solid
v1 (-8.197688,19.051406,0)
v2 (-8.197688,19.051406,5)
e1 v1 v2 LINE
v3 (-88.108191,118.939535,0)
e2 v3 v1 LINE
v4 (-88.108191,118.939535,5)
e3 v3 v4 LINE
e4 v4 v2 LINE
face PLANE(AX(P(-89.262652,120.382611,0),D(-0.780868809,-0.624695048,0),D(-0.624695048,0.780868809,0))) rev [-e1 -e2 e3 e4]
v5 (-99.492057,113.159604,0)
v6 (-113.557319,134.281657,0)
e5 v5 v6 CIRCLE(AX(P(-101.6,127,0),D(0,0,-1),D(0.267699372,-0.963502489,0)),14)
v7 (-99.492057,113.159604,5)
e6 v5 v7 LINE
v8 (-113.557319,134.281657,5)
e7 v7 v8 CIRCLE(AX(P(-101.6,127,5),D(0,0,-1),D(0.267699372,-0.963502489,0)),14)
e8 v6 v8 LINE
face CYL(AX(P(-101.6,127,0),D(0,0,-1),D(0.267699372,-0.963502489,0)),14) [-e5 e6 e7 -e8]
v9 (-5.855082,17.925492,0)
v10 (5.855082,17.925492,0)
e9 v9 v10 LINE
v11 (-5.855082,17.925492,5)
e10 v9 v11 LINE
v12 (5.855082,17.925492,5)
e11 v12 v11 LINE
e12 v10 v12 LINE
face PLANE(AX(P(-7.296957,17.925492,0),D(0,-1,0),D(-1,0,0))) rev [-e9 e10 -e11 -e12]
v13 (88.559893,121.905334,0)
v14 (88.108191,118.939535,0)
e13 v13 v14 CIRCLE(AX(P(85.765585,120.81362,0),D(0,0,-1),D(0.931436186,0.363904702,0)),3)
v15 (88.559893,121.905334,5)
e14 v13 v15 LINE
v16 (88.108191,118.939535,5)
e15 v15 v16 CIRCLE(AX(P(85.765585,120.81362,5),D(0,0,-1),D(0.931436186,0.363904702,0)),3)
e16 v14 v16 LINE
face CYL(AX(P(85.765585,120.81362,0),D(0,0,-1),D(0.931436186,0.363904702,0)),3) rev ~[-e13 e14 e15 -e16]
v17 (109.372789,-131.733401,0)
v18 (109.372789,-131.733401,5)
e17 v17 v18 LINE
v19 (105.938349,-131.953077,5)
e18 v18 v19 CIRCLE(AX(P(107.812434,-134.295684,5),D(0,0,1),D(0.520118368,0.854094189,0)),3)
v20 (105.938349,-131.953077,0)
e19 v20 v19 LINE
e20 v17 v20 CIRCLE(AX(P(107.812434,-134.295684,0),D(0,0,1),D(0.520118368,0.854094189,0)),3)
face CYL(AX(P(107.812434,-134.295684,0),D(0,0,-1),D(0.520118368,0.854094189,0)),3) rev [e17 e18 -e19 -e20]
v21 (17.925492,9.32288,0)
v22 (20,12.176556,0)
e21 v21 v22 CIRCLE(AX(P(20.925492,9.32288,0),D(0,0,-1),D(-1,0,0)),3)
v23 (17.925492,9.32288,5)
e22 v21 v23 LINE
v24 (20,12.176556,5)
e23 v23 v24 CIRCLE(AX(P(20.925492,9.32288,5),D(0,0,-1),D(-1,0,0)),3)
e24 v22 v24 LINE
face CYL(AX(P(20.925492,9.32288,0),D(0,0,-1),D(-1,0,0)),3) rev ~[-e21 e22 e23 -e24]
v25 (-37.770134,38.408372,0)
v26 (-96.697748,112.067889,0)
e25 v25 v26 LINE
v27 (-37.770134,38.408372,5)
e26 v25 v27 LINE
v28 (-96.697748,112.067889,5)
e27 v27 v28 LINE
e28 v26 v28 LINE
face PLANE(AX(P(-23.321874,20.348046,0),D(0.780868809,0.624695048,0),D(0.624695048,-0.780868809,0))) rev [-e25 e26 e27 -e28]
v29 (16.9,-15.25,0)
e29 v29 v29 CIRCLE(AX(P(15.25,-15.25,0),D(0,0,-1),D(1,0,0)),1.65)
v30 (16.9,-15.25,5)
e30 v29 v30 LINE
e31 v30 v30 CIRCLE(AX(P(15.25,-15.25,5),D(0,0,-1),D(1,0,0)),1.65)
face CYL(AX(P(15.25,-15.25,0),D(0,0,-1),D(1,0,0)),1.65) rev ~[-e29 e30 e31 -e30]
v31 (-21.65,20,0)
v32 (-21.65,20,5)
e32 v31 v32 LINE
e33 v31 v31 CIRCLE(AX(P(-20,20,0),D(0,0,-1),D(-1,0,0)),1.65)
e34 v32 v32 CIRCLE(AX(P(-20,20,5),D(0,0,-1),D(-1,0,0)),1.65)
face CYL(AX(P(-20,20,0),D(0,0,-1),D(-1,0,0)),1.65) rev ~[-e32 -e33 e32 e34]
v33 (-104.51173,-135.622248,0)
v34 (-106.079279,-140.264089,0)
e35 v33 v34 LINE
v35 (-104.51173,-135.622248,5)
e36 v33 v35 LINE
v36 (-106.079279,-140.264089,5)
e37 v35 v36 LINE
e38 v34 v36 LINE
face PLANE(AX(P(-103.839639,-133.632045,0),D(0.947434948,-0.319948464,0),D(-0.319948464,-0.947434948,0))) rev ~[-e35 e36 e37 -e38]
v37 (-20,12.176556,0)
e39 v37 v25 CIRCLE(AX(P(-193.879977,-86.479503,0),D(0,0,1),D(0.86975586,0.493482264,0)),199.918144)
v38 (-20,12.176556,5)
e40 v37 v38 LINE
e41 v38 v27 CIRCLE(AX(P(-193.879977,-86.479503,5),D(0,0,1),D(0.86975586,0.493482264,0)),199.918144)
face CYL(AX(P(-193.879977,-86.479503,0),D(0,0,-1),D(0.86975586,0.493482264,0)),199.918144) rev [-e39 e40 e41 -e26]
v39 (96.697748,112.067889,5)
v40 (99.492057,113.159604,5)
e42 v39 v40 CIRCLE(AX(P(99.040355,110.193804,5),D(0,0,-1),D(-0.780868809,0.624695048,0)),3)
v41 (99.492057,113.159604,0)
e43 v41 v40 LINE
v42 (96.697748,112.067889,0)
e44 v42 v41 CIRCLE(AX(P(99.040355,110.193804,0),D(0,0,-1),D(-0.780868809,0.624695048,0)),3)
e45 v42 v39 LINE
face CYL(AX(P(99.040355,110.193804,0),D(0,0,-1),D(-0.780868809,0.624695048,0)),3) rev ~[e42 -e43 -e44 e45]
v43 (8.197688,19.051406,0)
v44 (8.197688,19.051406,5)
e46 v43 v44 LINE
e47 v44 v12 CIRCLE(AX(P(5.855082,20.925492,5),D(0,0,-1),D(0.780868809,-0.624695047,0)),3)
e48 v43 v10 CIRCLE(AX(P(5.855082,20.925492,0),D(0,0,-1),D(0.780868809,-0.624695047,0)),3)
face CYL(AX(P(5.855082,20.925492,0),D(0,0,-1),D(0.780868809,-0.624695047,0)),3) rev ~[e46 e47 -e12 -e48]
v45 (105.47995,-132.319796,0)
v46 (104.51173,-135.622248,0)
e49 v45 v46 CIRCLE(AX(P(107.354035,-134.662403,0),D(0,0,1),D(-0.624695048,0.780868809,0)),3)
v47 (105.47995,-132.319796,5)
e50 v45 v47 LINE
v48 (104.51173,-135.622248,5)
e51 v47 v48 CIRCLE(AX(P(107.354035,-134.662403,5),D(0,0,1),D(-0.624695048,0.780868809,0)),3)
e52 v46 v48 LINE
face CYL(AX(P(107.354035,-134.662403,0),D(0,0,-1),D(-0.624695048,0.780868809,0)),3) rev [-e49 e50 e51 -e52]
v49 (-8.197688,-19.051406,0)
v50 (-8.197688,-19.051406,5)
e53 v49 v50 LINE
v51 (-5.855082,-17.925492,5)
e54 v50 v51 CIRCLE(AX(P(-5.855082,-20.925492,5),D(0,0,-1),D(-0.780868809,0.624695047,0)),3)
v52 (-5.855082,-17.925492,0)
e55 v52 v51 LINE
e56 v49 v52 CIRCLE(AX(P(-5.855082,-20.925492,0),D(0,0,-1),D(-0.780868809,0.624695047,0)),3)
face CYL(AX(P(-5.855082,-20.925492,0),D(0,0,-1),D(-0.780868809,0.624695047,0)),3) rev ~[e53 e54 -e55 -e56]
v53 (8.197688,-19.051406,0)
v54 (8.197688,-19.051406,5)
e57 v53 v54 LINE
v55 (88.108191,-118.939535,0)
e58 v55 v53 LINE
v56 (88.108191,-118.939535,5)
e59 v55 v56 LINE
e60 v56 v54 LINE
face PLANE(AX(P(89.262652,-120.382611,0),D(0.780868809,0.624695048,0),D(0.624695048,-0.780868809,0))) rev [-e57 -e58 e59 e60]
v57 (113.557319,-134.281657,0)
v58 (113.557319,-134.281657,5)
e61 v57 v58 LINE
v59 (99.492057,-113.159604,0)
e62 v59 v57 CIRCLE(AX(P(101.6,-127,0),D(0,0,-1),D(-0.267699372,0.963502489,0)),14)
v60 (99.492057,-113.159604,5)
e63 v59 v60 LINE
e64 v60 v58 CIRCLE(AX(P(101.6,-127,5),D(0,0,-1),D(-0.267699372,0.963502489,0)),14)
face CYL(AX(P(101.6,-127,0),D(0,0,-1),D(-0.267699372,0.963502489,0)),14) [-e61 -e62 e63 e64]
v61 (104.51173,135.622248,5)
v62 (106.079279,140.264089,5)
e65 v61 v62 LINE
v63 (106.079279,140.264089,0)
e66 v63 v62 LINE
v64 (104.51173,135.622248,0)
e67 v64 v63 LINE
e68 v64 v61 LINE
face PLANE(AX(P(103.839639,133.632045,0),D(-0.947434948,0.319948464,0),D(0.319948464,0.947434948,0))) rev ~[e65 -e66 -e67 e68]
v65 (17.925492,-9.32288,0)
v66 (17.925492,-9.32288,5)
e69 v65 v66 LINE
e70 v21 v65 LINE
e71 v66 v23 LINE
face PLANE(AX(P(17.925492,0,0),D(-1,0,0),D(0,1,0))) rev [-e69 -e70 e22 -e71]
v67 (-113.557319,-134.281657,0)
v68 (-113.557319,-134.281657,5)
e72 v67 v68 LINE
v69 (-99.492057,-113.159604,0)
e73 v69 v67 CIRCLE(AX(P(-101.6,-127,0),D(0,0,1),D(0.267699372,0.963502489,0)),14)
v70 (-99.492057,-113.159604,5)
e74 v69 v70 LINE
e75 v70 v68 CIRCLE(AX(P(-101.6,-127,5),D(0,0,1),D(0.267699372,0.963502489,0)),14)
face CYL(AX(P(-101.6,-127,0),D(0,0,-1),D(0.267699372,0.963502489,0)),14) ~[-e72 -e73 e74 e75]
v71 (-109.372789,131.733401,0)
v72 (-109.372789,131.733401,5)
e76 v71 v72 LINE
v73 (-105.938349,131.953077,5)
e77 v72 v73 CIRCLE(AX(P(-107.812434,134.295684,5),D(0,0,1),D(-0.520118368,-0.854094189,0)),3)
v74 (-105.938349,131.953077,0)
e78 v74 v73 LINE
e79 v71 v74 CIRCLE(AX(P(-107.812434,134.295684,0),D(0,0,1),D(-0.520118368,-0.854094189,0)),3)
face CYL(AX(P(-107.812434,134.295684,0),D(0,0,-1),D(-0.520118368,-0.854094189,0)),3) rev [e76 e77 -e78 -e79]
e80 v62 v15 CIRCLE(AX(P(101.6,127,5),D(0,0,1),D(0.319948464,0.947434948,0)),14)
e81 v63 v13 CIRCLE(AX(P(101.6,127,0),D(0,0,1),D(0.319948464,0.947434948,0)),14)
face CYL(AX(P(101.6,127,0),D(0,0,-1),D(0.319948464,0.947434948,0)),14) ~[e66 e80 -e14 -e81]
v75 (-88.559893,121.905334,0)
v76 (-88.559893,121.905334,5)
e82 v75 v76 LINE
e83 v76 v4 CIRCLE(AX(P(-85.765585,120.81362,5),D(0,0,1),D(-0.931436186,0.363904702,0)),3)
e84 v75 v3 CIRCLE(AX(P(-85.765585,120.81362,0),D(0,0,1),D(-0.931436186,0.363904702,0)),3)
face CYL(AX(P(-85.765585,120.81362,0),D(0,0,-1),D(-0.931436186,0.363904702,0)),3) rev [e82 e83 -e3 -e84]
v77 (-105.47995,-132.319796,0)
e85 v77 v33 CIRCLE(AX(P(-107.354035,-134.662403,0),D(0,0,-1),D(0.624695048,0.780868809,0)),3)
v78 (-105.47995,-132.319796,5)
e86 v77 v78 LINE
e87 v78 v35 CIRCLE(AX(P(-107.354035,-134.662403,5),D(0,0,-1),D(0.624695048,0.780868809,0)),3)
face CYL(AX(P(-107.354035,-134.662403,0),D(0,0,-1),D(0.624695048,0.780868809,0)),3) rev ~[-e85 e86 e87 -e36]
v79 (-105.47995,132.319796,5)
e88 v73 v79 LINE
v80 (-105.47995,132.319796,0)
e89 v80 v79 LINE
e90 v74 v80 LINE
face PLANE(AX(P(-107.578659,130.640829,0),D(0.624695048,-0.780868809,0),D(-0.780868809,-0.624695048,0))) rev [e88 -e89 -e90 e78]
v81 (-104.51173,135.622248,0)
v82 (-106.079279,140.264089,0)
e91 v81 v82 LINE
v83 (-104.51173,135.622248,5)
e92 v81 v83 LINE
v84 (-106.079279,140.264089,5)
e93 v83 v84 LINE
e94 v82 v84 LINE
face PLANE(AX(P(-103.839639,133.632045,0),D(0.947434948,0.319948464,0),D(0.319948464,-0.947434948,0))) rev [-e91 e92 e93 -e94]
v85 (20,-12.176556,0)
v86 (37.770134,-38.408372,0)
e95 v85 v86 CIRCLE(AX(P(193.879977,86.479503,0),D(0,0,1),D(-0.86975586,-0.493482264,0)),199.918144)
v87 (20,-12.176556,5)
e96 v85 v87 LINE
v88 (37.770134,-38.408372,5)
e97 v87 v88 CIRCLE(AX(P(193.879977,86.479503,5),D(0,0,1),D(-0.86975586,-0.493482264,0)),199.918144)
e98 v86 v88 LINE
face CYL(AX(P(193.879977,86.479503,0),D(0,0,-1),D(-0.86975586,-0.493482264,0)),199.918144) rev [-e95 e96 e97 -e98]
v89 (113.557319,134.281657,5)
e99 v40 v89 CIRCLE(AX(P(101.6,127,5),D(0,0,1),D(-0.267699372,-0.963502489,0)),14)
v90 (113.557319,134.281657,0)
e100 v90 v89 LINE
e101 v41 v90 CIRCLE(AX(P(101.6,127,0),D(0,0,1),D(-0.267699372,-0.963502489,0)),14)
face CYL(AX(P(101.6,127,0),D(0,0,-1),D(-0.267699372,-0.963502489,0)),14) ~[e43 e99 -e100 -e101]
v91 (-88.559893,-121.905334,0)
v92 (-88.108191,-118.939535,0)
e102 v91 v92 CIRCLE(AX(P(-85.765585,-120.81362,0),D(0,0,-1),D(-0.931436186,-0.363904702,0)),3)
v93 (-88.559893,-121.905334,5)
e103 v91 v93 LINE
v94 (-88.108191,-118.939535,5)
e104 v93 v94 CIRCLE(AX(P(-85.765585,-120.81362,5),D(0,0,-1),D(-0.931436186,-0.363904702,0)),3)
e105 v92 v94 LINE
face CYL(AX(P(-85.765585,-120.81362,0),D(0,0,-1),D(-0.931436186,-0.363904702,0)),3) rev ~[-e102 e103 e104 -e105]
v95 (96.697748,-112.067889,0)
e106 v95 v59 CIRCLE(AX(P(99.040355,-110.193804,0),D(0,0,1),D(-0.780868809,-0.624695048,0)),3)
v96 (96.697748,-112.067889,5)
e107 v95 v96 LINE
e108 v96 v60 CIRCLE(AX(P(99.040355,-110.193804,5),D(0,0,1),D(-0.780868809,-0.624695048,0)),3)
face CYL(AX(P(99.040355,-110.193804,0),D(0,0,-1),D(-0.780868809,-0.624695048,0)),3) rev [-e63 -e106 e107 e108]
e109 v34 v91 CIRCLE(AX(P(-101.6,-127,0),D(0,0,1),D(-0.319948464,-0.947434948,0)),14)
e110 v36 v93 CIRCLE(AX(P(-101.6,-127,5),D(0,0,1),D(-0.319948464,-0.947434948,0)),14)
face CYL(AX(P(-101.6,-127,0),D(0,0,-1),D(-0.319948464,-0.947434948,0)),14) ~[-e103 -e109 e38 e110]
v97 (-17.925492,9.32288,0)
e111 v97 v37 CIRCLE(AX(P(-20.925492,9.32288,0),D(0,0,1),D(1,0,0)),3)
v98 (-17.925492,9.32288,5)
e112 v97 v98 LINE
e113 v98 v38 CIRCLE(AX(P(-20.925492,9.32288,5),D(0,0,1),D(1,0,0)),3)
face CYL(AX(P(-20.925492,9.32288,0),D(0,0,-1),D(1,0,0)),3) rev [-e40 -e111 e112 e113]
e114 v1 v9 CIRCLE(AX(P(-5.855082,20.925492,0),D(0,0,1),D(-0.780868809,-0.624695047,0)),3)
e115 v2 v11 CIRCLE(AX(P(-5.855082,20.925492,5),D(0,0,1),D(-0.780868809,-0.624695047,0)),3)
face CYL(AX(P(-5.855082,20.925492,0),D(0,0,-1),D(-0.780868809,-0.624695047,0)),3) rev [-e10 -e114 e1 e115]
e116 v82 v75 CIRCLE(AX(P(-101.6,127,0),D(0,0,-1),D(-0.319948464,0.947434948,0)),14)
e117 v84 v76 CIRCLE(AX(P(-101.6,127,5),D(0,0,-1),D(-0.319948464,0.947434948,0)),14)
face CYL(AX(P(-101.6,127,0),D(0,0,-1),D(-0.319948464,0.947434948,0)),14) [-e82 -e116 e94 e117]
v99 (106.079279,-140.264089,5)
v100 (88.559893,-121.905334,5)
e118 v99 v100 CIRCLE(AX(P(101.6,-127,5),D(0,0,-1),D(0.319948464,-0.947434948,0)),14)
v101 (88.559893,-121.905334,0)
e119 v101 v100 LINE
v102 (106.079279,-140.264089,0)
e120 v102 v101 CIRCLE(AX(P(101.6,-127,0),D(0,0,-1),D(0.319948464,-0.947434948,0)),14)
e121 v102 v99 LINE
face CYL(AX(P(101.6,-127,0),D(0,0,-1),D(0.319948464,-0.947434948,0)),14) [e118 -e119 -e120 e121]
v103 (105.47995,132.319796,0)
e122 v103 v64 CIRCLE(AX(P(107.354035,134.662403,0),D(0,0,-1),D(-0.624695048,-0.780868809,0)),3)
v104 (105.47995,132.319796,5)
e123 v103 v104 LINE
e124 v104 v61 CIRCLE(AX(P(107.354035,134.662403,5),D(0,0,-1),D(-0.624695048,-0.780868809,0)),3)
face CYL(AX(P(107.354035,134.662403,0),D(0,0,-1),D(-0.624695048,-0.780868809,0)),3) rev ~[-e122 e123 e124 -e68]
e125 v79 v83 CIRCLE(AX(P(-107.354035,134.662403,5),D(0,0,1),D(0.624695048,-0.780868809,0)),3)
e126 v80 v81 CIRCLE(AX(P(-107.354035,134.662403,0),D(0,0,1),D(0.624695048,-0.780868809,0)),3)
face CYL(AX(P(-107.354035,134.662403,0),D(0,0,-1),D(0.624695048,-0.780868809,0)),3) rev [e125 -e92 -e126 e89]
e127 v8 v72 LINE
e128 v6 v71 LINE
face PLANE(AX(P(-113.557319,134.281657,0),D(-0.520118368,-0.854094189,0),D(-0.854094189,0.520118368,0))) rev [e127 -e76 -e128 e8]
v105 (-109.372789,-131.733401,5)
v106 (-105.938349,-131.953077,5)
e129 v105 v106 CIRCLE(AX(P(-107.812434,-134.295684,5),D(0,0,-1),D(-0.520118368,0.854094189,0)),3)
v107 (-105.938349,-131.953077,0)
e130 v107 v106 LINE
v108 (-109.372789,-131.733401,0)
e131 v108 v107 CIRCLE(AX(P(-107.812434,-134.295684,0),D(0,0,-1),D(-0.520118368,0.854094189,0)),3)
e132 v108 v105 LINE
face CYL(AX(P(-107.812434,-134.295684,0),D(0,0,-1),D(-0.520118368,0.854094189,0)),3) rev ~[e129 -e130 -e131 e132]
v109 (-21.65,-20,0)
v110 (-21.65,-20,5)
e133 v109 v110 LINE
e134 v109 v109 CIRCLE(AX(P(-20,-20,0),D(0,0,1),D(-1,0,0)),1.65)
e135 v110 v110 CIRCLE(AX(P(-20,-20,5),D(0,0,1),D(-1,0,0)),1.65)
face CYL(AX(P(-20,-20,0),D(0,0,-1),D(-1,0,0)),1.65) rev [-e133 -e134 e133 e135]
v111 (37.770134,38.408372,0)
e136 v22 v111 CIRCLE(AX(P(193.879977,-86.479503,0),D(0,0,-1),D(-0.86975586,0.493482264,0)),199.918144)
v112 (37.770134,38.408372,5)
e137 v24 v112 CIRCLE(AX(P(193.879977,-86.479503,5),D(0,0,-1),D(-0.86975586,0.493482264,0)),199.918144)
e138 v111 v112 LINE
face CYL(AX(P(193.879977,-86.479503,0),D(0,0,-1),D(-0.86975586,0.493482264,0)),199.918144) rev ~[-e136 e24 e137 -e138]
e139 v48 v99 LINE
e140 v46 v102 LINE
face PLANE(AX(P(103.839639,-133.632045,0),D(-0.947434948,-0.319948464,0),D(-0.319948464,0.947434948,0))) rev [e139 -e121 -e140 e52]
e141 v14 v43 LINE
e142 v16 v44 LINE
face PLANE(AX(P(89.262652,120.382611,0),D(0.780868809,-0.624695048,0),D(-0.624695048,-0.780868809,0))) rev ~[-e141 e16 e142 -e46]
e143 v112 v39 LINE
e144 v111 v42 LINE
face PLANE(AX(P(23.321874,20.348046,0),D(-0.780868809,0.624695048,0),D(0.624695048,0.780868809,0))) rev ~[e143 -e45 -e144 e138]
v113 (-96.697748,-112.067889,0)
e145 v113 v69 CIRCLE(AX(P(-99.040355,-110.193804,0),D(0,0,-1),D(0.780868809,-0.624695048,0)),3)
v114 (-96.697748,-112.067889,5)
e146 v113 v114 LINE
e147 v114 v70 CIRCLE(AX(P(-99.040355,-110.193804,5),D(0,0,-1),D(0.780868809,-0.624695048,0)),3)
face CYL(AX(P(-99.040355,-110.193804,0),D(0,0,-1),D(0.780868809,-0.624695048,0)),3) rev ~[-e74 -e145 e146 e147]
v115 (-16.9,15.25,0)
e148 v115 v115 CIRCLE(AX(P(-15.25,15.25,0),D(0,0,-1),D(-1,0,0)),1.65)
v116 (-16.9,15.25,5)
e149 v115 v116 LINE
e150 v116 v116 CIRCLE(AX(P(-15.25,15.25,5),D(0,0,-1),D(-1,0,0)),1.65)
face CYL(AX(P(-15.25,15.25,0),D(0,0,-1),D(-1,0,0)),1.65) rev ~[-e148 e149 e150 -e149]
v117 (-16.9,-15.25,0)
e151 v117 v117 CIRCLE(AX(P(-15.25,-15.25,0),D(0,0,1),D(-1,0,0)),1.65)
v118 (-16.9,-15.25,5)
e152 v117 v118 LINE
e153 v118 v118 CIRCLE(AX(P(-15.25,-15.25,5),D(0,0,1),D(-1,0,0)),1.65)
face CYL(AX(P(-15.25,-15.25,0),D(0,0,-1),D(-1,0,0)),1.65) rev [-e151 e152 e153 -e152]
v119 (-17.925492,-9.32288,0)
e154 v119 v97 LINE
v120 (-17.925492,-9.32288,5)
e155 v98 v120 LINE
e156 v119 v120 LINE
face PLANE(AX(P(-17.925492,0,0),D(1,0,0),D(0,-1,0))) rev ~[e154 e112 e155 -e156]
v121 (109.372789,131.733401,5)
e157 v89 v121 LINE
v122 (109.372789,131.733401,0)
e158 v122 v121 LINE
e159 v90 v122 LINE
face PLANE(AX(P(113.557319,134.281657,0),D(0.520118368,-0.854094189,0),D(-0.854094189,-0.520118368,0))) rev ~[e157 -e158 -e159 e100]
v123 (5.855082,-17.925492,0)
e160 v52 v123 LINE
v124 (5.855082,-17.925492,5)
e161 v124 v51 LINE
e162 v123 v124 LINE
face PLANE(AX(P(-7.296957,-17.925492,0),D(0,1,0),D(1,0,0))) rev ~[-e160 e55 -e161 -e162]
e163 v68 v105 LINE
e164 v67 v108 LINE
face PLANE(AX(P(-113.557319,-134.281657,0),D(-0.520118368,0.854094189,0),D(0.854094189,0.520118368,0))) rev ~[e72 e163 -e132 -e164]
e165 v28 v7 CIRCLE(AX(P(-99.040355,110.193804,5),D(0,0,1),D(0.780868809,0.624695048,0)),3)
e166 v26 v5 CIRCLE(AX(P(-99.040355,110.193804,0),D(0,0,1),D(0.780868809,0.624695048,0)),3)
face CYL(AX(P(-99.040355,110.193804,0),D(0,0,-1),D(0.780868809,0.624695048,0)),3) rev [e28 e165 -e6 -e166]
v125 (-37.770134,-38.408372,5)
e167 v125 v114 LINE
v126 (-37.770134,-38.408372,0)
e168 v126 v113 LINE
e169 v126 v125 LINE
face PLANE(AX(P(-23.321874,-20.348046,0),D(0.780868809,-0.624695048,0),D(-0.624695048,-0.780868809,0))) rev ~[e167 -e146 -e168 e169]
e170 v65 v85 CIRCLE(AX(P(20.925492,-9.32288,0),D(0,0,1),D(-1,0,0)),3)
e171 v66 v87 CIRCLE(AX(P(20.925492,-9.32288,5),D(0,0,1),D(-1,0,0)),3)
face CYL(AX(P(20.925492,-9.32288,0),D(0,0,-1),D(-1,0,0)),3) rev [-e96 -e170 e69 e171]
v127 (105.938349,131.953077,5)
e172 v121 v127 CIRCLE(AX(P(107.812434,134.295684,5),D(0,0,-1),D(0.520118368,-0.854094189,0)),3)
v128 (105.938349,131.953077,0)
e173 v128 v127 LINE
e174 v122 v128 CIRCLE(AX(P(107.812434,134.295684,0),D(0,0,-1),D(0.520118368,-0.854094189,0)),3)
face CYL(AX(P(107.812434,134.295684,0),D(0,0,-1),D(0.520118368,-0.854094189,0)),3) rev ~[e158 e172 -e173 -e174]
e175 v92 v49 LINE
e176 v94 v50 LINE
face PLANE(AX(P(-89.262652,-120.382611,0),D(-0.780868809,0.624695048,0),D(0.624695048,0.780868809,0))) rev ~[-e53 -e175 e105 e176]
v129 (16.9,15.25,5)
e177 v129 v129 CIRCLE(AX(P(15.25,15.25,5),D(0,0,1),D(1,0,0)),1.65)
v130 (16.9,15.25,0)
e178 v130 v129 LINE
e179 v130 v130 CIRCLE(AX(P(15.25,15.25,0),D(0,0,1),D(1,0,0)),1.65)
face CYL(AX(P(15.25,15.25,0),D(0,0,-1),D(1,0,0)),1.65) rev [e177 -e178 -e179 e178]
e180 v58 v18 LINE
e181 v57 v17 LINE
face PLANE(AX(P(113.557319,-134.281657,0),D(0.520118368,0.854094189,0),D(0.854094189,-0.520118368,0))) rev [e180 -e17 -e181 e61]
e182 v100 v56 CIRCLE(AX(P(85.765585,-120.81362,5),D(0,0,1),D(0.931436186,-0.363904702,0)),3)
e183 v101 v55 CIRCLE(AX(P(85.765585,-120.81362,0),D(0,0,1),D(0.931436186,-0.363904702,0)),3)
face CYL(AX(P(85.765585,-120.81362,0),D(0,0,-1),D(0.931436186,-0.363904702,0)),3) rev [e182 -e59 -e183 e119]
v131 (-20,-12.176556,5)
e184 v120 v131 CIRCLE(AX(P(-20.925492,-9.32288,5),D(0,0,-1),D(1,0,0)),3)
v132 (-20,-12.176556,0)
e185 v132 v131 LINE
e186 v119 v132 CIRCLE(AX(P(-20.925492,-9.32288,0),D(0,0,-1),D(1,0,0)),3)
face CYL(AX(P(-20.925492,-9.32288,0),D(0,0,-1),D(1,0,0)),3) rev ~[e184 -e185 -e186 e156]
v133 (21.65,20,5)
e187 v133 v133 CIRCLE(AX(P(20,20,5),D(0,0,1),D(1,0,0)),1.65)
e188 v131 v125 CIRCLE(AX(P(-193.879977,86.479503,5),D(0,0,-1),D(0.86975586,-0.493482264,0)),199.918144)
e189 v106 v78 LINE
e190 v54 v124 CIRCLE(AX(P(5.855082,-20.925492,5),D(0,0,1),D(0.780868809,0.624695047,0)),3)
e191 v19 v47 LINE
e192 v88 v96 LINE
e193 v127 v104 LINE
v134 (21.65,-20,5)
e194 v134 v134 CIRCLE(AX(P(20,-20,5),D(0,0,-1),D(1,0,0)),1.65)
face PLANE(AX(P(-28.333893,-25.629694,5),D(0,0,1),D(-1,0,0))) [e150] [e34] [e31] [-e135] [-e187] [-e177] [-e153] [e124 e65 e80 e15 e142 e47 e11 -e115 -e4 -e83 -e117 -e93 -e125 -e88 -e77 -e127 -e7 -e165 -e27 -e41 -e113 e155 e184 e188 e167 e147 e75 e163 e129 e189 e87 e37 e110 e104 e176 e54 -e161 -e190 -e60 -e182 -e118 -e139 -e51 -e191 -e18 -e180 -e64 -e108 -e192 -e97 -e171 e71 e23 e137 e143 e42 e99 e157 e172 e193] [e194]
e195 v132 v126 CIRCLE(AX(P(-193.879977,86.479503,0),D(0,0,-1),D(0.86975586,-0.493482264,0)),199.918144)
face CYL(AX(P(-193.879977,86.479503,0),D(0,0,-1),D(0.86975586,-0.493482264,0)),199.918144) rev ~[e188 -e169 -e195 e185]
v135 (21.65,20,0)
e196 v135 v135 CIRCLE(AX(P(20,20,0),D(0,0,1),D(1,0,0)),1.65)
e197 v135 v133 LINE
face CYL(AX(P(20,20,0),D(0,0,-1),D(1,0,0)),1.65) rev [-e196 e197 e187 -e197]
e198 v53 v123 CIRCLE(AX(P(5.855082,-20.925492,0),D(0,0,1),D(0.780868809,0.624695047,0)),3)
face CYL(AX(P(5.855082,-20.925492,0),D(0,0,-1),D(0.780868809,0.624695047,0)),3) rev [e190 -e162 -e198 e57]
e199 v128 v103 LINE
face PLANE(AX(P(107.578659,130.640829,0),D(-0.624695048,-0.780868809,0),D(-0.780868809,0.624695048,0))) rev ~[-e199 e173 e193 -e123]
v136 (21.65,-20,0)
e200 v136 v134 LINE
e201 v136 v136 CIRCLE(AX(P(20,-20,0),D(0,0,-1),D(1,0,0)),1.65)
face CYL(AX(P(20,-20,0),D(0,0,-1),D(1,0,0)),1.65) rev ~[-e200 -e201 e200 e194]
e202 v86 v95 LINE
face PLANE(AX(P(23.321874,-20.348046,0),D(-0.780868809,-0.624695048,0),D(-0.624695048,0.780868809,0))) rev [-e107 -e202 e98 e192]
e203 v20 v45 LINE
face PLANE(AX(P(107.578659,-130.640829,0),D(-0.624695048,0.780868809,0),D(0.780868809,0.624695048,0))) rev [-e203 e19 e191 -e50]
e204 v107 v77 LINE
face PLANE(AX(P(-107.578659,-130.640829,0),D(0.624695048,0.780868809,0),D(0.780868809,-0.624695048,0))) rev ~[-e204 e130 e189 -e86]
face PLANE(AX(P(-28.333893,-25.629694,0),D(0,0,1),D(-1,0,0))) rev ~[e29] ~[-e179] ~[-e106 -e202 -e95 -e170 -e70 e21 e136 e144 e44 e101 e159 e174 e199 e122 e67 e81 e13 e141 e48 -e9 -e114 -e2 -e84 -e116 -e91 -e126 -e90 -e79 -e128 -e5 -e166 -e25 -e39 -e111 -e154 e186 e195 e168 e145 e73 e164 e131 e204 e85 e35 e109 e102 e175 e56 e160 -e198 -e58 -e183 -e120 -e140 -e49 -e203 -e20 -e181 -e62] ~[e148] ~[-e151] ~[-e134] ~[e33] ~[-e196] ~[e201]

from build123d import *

# Parameters (mm, degrees)
F0_R        = 1.65
F1_DEPTH    = 5
F2_T1_DEPTH = 5
F3_T1_DEPTH = 5


# Not quite as in the source:
# - a fillet or chamfer that OpenCascade refuses, or shapes differently, is made with other operations: its cross-section is extruded or revolved along the edge and cut away or added


with BuildPart() as f1:
    # F0 (on Top) → F1 (new body)
    with BuildSketch(Plane.XY):
        Polygon((7.0434366612, 0), (14.0868733224, 0), (17.9254915565, 0), (17.9254915565, 12.1765555814), (17.9254915565, 13.6025686192), align=None)
        Polygon((0, 0), (7.0434366612, 0), (17.9254915565, 13.6025686192), (17.9254915565, 17.9254915565), (7.296956584, 17.9254915565), (0, 8.8042958265), align=None)
        with Locations((15.25, 15.25)):
            Circle(F0_R, mode=Mode.SUBTRACT)
        with BuildLine():
            Line((17.9254915565, 17.9254915565), (17.9254915565, 13.6025686192))
            Line((17.9254915565, 13.6025686192), (17.9254915565, 12.1765555814))
            Line((17.9254915565, 12.1765555814), (20, 12.1765555814))
            Line((20, 12.1765555814), (23.3218736491, 20.3480462349))
            Line((23.3218736491, 20.3480462349), (97.8522087861, 113.5109651562))
            ThreePointArc((97.8522087861, 113.5109651562), (92.8542693342, 116.0678366678), (89.2626518823, 120.3826106793))
            Line((89.2626518823, 120.3826106793), (7.296956584, 17.9254915565))
            Line((7.296956584, 17.9254915565), (17.9254915565, 17.9254915565))
        make_face()
        with Locations((20, 20)):
            Circle(F0_R, mode=Mode.SUBTRACT)
        Polygon((0, 17.9254915565), (0, 8.8042958265), (7.296956584, 17.9254915565), align=None)
        with BuildLine():
            ThreePointArc((106.0792785003, 140.2640892683), (90.9109583101, 136.0412602966), (89.2626518823, 120.3826106793))
            ThreePointArc((89.2626518823, 120.3826106793), (92.8542693342, 116.0678366678), (97.8522087861, 113.5109651562))
            ThreePointArc((97.8522087861, 113.5109651562), (112.7671167579, 118.5563335383), (113.5573186397, 134.2816571567))
            Line((113.5573186397, 134.2816571567), (107.5786593199, 130.6408285784))
            Line((107.5786593199, 130.6408285784), (103.8396392501, 133.6320446341))
            Line((103.8396392501, 133.6320446341), (106.0792785003, 140.2640892683))
        make_face()
    extrude(amount=F1_DEPTH)

    # F2: fillet of radius 3 on 6 edges, made by hand

    # F2_s2 → F2_t1 (join)
    with BuildSketch(Plane.XY):
        with BuildLine():
            ThreePointArc((8.1976884699, 19.0514064139), (7.1546482331, 18.2215818476), (5.8550820416, 17.9254915565))
            Line((5.8550820416, 17.9254915565), (7.296956584, 17.9254915565))
            Line((7.296956584, 17.9254915565), (8.1976884699, 19.0514064139))
        make_face()
        with BuildLine():
            ThreePointArc((17.9254915565, 9.3228798152), (18.4989225106, 11.0868987111), (20, 12.1765555814))
            Line((20, 12.1765555814), (17.9254915565, 12.1765555814))
            Line((17.9254915565, 12.1765555814), (17.9254915565, 9.3228798152))
        make_face()
        with BuildLine():
            ThreePointArc((96.6977481783, 112.0678893964), (97.9486405, 112.9881128103), (99.4920567349, 113.1596035031))
            ThreePointArc((99.4920567349, 113.1596035031), (98.6668668075, 113.3107074808), (97.8522087861, 113.5109651562))
            Line((97.8522087861, 113.5109651562), (96.6977481783, 112.0678893964))
        make_face()
        with BuildLine():
            ThreePointArc((88.5598934027, 121.9053341689), (88.7313840955, 120.361917934), (88.1081912745, 118.9395349195))
            Line((88.1081912745, 118.9395349195), (89.2626518823, 120.3826106793))
            ThreePointArc((89.2626518823, 120.3826106793), (88.8884511699, 121.1334399909), (88.5598934027, 121.9053341689))
        make_face()
        with BuildLine():
            ThreePointArc((105.4799499303, 132.31979609), (104.4752105502, 133.8183827512), (104.5117302298, 135.6222479112))
            Line((104.5117302298, 135.6222479112), (103.8396392501, 133.6320446341))
            Line((103.8396392501, 133.6320446341), (105.4799499303, 132.31979609))
        make_face()
        with BuildLine():
            ThreePointArc((109.3727888874, 131.7334009852), (107.6209369535, 131.3018016285), (105.9383486397, 131.9530771225))
            Line((105.9383486397, 131.9530771225), (107.5786593199, 130.6408285784))
            Line((107.5786593199, 130.6408285784), (109.3727888874, 131.7334009852))
        make_face()
    extrude(amount=F2_T1_DEPTH)

    # F3: fillet of radius 199.9181440352 on 1 edges, made by hand

    # F3_s2 → F3_t1 (join)
    with BuildSketch(Plane.XY):
        with BuildLine():
            ThreePointArc((20, 12.1765555814), (28.3645778619, 25.6450570093), (37.770134119, 38.4083718223))
            Line((37.770134119, 38.4083718223), (23.3218736491, 20.3480462349))
            Line((23.3218736491, 20.3480462349), (20, 12.1765555814))
        make_face()
    extrude(amount=F3_T1_DEPTH)

    # F4: F1 across plane


with BuildPart() as f1_1:
    add(f1.part)
    add(f1.part.mirror(Plane.YZ))

    # F5: F1 across plane


with BuildPart() as f1_2:
    add(f1_1.part)
    add(f1_1.part.mirror(Plane.XZ))


solid = f1_2.part
